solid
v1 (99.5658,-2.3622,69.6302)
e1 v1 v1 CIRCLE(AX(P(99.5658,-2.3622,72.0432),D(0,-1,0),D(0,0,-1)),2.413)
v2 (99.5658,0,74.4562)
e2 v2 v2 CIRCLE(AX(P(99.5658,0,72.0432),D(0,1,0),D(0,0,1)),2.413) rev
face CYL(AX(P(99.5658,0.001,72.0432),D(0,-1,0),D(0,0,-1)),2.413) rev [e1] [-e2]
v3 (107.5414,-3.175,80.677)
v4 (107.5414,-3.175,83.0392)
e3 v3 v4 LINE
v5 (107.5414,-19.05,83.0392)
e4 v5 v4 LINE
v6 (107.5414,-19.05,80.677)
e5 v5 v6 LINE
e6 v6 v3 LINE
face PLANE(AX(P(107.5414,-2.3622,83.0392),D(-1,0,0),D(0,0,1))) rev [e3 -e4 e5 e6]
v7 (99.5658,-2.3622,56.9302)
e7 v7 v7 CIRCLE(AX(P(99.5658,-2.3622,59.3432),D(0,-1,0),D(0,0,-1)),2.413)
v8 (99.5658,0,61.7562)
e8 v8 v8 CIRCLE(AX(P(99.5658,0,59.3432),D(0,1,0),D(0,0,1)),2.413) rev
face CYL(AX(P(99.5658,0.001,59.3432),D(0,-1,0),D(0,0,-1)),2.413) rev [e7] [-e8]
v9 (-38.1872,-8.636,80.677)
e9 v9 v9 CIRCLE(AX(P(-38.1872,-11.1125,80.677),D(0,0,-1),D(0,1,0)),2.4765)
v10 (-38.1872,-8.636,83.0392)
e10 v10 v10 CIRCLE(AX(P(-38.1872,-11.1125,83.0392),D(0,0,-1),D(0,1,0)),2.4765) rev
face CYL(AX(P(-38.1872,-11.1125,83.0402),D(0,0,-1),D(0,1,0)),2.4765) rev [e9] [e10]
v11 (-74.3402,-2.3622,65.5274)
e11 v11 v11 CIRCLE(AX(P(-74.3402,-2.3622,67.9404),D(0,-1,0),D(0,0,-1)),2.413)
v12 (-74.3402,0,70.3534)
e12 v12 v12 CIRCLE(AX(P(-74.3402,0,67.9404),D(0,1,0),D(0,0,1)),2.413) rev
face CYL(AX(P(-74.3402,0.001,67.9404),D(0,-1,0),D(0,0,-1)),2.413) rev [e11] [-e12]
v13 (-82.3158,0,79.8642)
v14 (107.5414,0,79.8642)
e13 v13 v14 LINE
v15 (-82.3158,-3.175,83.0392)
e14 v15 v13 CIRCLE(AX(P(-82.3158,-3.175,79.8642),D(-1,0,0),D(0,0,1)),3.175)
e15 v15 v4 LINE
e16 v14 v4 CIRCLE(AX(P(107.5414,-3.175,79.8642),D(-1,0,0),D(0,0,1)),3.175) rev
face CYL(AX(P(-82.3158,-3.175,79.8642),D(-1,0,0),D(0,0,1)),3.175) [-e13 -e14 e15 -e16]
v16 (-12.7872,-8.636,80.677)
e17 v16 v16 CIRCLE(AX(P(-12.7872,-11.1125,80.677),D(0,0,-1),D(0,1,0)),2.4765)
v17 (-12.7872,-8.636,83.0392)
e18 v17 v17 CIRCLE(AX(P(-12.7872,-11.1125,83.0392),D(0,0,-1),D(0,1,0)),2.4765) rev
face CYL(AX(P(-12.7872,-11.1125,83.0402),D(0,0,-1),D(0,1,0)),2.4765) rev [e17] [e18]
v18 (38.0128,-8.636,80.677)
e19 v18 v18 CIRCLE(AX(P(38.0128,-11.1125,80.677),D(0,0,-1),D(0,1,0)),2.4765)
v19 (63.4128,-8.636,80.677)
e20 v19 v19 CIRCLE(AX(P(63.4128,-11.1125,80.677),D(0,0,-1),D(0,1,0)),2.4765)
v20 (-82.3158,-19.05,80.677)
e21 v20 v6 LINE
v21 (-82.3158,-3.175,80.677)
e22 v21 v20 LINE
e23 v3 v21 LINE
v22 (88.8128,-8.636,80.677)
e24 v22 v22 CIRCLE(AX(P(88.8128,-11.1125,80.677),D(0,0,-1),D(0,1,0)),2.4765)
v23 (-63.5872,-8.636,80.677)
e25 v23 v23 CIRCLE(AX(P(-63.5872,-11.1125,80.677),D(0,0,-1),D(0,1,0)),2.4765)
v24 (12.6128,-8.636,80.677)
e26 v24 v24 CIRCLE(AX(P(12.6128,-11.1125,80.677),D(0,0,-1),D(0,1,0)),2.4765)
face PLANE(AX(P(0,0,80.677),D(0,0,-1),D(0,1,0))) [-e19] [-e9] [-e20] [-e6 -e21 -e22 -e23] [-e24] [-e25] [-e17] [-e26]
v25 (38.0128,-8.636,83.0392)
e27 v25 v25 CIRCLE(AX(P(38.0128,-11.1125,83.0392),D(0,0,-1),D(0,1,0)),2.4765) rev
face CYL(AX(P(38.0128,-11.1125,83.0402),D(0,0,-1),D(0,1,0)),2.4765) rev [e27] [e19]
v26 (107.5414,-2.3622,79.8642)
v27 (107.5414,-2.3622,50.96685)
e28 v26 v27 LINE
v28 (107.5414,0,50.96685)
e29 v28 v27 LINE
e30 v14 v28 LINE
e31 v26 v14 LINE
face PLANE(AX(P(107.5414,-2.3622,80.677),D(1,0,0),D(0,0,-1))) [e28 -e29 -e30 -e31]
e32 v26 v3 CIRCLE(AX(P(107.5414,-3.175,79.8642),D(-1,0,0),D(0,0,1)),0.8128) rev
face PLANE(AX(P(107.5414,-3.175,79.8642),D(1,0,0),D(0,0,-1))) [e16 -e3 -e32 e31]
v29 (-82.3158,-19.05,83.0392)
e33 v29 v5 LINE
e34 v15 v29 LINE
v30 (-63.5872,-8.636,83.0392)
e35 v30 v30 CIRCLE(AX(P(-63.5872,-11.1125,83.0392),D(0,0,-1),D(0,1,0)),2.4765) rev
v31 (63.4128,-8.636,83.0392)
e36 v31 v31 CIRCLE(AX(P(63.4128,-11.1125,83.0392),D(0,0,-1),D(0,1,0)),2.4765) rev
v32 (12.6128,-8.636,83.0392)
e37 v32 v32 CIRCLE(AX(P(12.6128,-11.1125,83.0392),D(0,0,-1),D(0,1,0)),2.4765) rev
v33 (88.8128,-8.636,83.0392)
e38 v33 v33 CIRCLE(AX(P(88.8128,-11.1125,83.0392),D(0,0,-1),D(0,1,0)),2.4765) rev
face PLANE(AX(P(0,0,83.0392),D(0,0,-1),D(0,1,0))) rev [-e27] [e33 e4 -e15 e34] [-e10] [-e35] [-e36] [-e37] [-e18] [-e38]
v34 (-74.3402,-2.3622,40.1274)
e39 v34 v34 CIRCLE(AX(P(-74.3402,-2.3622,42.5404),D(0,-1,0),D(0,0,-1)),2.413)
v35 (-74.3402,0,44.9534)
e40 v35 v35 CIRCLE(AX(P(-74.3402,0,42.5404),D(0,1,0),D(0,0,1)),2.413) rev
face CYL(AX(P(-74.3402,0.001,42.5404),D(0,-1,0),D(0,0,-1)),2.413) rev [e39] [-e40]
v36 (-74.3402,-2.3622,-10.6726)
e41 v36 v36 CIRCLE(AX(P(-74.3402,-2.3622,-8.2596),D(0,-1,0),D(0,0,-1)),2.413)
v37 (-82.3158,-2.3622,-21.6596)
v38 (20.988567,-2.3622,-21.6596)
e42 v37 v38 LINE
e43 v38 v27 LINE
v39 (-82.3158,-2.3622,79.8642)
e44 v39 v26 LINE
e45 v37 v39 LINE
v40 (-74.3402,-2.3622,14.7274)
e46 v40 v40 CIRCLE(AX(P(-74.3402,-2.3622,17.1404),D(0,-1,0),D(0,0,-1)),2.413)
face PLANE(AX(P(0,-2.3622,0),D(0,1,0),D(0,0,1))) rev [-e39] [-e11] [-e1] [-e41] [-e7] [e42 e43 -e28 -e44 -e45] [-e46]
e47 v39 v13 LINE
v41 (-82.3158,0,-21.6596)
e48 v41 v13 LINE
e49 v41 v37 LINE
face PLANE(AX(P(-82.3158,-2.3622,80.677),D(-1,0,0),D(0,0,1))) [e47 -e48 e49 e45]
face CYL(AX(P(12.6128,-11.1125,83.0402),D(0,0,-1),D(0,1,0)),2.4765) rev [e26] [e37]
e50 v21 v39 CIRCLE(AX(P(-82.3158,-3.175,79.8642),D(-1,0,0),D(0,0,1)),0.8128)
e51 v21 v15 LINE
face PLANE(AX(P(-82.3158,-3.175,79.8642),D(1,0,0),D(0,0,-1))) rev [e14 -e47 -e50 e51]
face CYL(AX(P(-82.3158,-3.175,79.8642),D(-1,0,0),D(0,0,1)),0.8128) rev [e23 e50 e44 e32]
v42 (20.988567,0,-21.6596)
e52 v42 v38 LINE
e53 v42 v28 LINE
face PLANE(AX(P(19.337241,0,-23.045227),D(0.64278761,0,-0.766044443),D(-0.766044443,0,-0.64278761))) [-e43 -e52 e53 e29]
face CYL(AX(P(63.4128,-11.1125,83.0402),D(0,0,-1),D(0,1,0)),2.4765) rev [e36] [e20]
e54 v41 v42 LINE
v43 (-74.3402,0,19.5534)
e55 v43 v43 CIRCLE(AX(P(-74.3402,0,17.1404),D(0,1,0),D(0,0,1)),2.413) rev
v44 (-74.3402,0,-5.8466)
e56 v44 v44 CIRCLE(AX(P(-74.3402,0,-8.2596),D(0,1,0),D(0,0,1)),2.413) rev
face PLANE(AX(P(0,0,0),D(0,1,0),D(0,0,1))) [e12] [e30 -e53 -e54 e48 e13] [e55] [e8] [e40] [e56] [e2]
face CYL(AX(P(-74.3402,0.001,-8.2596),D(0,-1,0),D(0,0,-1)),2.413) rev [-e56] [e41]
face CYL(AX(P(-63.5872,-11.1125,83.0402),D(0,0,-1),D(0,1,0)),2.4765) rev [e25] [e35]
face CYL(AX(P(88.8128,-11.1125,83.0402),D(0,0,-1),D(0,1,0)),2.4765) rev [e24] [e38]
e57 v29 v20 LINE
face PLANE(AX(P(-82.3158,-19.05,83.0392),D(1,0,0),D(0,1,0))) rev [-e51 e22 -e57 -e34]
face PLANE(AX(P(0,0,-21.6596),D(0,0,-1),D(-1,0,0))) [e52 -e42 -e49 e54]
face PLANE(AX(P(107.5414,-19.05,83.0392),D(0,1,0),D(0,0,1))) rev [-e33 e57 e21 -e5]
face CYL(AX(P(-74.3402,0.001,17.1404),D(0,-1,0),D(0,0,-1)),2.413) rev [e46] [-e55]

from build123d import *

# Parameters (mm, degrees)
SKETCH1_W                    = 189.8572
SKETCH1_H                    = 175.514
BASE_FLANGE1_DEPTH           = 2.3622
EDGE_FLANGE4_STRIP_W         = 11.0744
EDGE_FLANGE4_STRIP_H         = 2.3622
EDGE_FLANGE4_STRIP_CUT_DEPTH = 189.8572
EDGE_FLANGE4_DEPTH           = 189.8572
CUT_EXTRUDE1_DEPTH           = 145.352665205
CUT_EXTRUDE5_REACH           = 151.669
SKETCH41_R                   = 2.4765
CUT_EXTRUDE6_REACH           = 138.891
SKETCH42_R                   = 2.413


# Sheet-metal steps are written as plain solids
with BuildPart() as part:
    # Sketch1 → Base-Flange1 (new body)
    with BuildSketch(Plane(origin=(0, 0, 0), x_dir=(1, 0, 0), z_dir=(0, 1, 0))):
        with Locations((12.6128, 7.08)):
            Rectangle(SKETCH1_W, SKETCH1_H)
    extrude(amount=-BASE_FLANGE1_DEPTH)

    # Edge-Flange4 strip (across the edge) → Edge-Flange4 strip cut (cut)
    with BuildSketch(Plane(origin=(107.5414, -2.3622, 80.677), x_dir=(0, 0, -1), z_dir=(-1, 0, 0))):
        with Locations((-4.7244, -1.1811)):
            Rectangle(EDGE_FLANGE4_STRIP_W, EDGE_FLANGE4_STRIP_H)
    extrude(amount=EDGE_FLANGE4_STRIP_CUT_DEPTH, mode=Mode.SUBTRACT)

    # Edge-Flange4 section (across the edge) → Edge-Flange4 (add)
    with BuildSketch(Plane(origin=(107.5414, -2.3622, 80.677), x_dir=(0, 0, -1), z_dir=(-1, 0, 0))):
        with BuildLine():
            Line((-2.3622, 0.8128), (-2.3622, 16.6878))
            Line((-2.3622, 16.6878), (0, 16.6878))
            Line((0, 16.6878), (0, 0.8128))
            ThreePointArc((0, 0.8128), (0.238063608, 0.238063608), (0.8128, 0))
            Line((0.8128, 0), (0.8128, -2.3622))
            ThreePointArc((0.8128, -2.3622), (-1.43226403, -1.43226403), (-2.3622, 0.8128))
        make_face()
    extrude(amount=EDGE_FLANGE4_DEPTH)

    # Sketch36 → Cut-Extrude1 (cut, through all)
    with BuildSketch(Plane.XZ.offset(2.3622)):
        Polygon((20.98856689, -21.6596), (-82.3158, -21.6596), (-82.3158, -94.837), (107.5414, -94.837), (107.5414, 50.96685034), align=None)
    extrude(amount=-CUT_EXTRUDE1_DEPTH, mode=Mode.SUBTRACT)

    # Sketch41 → Cut-Extrude5 (cut, up to next)
    with BuildSketch(Plane(origin=(0, 0, 80.677), x_dir=(-1, 0, 0), z_dir=(0, 0, -1)), mode=Mode.PRIVATE) as cut_extrude5_sk1:
        with Locations(Location((-88.8128, -11.1125, 0), (0, 0, 90))):
            Circle(SKETCH41_R)
    cut_extrude5_tool1 = extrude(cut_extrude5_sk1.sketch, amount=-CUT_EXTRUDE5_REACH, mode=Mode.PRIVATE) & part.part
    # Sketch41 → Cut-Extrude5 (cut, up to next)
    with BuildSketch(Plane(origin=(0, 0, 80.677), x_dir=(-1, 0, 0), z_dir=(0, 0, -1)), mode=Mode.PRIVATE) as cut_extrude5_sk2:
        with Locations(Location((-63.4128, -11.1125, 0), (0, 0, 90))):
            Circle(SKETCH41_R)
    cut_extrude5_tool2 = extrude(cut_extrude5_sk2.sketch, amount=-CUT_EXTRUDE5_REACH, mode=Mode.PRIVATE) & part.part
    # Sketch41 → Cut-Extrude5 (cut, up to next)
    with BuildSketch(Plane(origin=(0, 0, 80.677), x_dir=(-1, 0, 0), z_dir=(0, 0, -1)), mode=Mode.PRIVATE) as cut_extrude5_sk3:
        with Locations(Location((-38.0128, -11.1125, 0), (0, 0, 90))):
            Circle(SKETCH41_R)
    cut_extrude5_tool3 = extrude(cut_extrude5_sk3.sketch, amount=-CUT_EXTRUDE5_REACH, mode=Mode.PRIVATE) & part.part
    # Sketch41 → Cut-Extrude5 (cut, up to next)
    with BuildSketch(Plane(origin=(0, 0, 80.677), x_dir=(-1, 0, 0), z_dir=(0, 0, -1)), mode=Mode.PRIVATE) as cut_extrude5_sk4:
        with Locations(Location((-12.6128, -11.1125, 0), (0, 0, 90))):
            Circle(SKETCH41_R)
    cut_extrude5_tool4 = extrude(cut_extrude5_sk4.sketch, amount=-CUT_EXTRUDE5_REACH, mode=Mode.PRIVATE) & part.part
    # Sketch41 → Cut-Extrude5 (cut, up to next)
    with BuildSketch(Plane(origin=(0, 0, 80.677), x_dir=(-1, 0, 0), z_dir=(0, 0, -1)), mode=Mode.PRIVATE) as cut_extrude5_sk5:
        with Locations(Location((12.7872, -11.1125, 0), (0, 0, 90))):
            Circle(SKETCH41_R)
    cut_extrude5_tool5 = extrude(cut_extrude5_sk5.sketch, amount=-CUT_EXTRUDE5_REACH, mode=Mode.PRIVATE) & part.part
    # Sketch41 → Cut-Extrude5 (cut, up to next)
    with BuildSketch(Plane(origin=(0, 0, 80.677), x_dir=(-1, 0, 0), z_dir=(0, 0, -1)), mode=Mode.PRIVATE) as cut_extrude5_sk6:
        with Locations(Location((38.1872, -11.1125, 0), (0, 0, 90))):
            Circle(SKETCH41_R)
    cut_extrude5_tool6 = extrude(cut_extrude5_sk6.sketch, amount=-CUT_EXTRUDE5_REACH, mode=Mode.PRIVATE) & part.part
    # Sketch41 → Cut-Extrude5 (cut, up to next)
    with BuildSketch(Plane(origin=(0, 0, 80.677), x_dir=(-1, 0, 0), z_dir=(0, 0, -1)), mode=Mode.PRIVATE) as cut_extrude5_sk7:
        with Locations(Location((63.5872, -11.1125, 0), (0, 0, 90))):
            Circle(SKETCH41_R)
    cut_extrude5_tool7 = extrude(cut_extrude5_sk7.sketch, amount=-CUT_EXTRUDE5_REACH, mode=Mode.PRIVATE) & part.part
    add(cut_extrude5_tool1.solids().sort_by_distance((88.8128, -11.1125, 80.677))[0], mode=Mode.SUBTRACT)
    add(cut_extrude5_tool2.solids().sort_by_distance((63.4128, -11.1125, 80.677))[0], mode=Mode.SUBTRACT)
    add(cut_extrude5_tool3.solids().sort_by_distance((38.0128, -11.1125, 80.677))[0], mode=Mode.SUBTRACT)
    add(cut_extrude5_tool4.solids().sort_by_distance((12.6128, -11.1125, 80.677))[0], mode=Mode.SUBTRACT)
    add(cut_extrude5_tool5.solids().sort_by_distance((-12.7872, -11.1125, 80.677))[0], mode=Mode.SUBTRACT)
    add(cut_extrude5_tool6.solids().sort_by_distance((-38.1872, -11.1125, 80.677))[0], mode=Mode.SUBTRACT)
    add(cut_extrude5_tool7.solids().sort_by_distance((-63.5872, -11.1125, 80.677))[0], mode=Mode.SUBTRACT)

    # Sketch42 → Cut-Extrude6 (cut, up to next)
    with BuildSketch(Plane.XZ.offset(2.3622), mode=Mode.PRIVATE) as cut_extrude6_sk1:
        with Locations(Location((-74.3402, -8.2596, 0), (0, 0, 270))):
            Circle(SKETCH42_R)
    cut_extrude6_tool1 = extrude(cut_extrude6_sk1.sketch, amount=-CUT_EXTRUDE6_REACH, mode=Mode.PRIVATE) & part.part
    # Sketch42 → Cut-Extrude6 (cut, up to next)
    with BuildSketch(Plane.XZ.offset(2.3622), mode=Mode.PRIVATE) as cut_extrude6_sk2:
        with Locations(Location((-74.3402, 17.1404, 0), (0, 0, 270))):
            Circle(SKETCH42_R)
    cut_extrude6_tool2 = extrude(cut_extrude6_sk2.sketch, amount=-CUT_EXTRUDE6_REACH, mode=Mode.PRIVATE) & part.part
    # Sketch42 → Cut-Extrude6 (cut, up to next)
    with BuildSketch(Plane.XZ.offset(2.3622), mode=Mode.PRIVATE) as cut_extrude6_sk3:
        with Locations(Location((-74.3402, 42.5404, 0), (0, 0, 270))):
            Circle(SKETCH42_R)
    cut_extrude6_tool3 = extrude(cut_extrude6_sk3.sketch, amount=-CUT_EXTRUDE6_REACH, mode=Mode.PRIVATE) & part.part
    # Sketch42 → Cut-Extrude6 (cut, up to next)
    with BuildSketch(Plane.XZ.offset(2.3622), mode=Mode.PRIVATE) as cut_extrude6_sk4:
        with Locations(Location((-74.3402, 67.9404, 0), (0, 0, 270))):
            Circle(SKETCH42_R)
    cut_extrude6_tool4 = extrude(cut_extrude6_sk4.sketch, amount=-CUT_EXTRUDE6_REACH, mode=Mode.PRIVATE) & part.part
    # Sketch42 → Cut-Extrude6 (cut, up to next)
    with BuildSketch(Plane.XZ.offset(2.3622), mode=Mode.PRIVATE) as cut_extrude6_sk5:
        with Locations(Location((99.5658, 59.3432, 0), (0, 0, 270))):
            Circle(SKETCH42_R)
    cut_extrude6_tool5 = extrude(cut_extrude6_sk5.sketch, amount=-CUT_EXTRUDE6_REACH, mode=Mode.PRIVATE) & part.part
    # Sketch42 → Cut-Extrude6 (cut, up to next)
    with BuildSketch(Plane.XZ.offset(2.3622), mode=Mode.PRIVATE) as cut_extrude6_sk6:
        with Locations(Location((99.5658, 72.0432, 0), (0, 0, 270))):
            Circle(SKETCH42_R)
    cut_extrude6_tool6 = extrude(cut_extrude6_sk6.sketch, amount=-CUT_EXTRUDE6_REACH, mode=Mode.PRIVATE) & part.part
    add(cut_extrude6_tool1.solids().sort_by_distance((-74.3402, -2.3622, -8.2596))[0], mode=Mode.SUBTRACT)
    add(cut_extrude6_tool2.solids().sort_by_distance((-74.3402, -2.3622, 17.1404))[0], mode=Mode.SUBTRACT)
    add(cut_extrude6_tool3.solids().sort_by_distance((-74.3402, -2.3622, 42.5404))[0], mode=Mode.SUBTRACT)
    add(cut_extrude6_tool4.solids().sort_by_distance((-74.3402, -2.3622, 67.9404))[0], mode=Mode.SUBTRACT)
    add(cut_extrude6_tool5.solids().sort_by_distance((99.5658, -2.3622, 59.3432))[0], mode=Mode.SUBTRACT)
    add(cut_extrude6_tool6.solids().sort_by_distance((99.5658, -2.3622, 72.0432))[0], mode=Mode.SUBTRACT)


solid = part.part
